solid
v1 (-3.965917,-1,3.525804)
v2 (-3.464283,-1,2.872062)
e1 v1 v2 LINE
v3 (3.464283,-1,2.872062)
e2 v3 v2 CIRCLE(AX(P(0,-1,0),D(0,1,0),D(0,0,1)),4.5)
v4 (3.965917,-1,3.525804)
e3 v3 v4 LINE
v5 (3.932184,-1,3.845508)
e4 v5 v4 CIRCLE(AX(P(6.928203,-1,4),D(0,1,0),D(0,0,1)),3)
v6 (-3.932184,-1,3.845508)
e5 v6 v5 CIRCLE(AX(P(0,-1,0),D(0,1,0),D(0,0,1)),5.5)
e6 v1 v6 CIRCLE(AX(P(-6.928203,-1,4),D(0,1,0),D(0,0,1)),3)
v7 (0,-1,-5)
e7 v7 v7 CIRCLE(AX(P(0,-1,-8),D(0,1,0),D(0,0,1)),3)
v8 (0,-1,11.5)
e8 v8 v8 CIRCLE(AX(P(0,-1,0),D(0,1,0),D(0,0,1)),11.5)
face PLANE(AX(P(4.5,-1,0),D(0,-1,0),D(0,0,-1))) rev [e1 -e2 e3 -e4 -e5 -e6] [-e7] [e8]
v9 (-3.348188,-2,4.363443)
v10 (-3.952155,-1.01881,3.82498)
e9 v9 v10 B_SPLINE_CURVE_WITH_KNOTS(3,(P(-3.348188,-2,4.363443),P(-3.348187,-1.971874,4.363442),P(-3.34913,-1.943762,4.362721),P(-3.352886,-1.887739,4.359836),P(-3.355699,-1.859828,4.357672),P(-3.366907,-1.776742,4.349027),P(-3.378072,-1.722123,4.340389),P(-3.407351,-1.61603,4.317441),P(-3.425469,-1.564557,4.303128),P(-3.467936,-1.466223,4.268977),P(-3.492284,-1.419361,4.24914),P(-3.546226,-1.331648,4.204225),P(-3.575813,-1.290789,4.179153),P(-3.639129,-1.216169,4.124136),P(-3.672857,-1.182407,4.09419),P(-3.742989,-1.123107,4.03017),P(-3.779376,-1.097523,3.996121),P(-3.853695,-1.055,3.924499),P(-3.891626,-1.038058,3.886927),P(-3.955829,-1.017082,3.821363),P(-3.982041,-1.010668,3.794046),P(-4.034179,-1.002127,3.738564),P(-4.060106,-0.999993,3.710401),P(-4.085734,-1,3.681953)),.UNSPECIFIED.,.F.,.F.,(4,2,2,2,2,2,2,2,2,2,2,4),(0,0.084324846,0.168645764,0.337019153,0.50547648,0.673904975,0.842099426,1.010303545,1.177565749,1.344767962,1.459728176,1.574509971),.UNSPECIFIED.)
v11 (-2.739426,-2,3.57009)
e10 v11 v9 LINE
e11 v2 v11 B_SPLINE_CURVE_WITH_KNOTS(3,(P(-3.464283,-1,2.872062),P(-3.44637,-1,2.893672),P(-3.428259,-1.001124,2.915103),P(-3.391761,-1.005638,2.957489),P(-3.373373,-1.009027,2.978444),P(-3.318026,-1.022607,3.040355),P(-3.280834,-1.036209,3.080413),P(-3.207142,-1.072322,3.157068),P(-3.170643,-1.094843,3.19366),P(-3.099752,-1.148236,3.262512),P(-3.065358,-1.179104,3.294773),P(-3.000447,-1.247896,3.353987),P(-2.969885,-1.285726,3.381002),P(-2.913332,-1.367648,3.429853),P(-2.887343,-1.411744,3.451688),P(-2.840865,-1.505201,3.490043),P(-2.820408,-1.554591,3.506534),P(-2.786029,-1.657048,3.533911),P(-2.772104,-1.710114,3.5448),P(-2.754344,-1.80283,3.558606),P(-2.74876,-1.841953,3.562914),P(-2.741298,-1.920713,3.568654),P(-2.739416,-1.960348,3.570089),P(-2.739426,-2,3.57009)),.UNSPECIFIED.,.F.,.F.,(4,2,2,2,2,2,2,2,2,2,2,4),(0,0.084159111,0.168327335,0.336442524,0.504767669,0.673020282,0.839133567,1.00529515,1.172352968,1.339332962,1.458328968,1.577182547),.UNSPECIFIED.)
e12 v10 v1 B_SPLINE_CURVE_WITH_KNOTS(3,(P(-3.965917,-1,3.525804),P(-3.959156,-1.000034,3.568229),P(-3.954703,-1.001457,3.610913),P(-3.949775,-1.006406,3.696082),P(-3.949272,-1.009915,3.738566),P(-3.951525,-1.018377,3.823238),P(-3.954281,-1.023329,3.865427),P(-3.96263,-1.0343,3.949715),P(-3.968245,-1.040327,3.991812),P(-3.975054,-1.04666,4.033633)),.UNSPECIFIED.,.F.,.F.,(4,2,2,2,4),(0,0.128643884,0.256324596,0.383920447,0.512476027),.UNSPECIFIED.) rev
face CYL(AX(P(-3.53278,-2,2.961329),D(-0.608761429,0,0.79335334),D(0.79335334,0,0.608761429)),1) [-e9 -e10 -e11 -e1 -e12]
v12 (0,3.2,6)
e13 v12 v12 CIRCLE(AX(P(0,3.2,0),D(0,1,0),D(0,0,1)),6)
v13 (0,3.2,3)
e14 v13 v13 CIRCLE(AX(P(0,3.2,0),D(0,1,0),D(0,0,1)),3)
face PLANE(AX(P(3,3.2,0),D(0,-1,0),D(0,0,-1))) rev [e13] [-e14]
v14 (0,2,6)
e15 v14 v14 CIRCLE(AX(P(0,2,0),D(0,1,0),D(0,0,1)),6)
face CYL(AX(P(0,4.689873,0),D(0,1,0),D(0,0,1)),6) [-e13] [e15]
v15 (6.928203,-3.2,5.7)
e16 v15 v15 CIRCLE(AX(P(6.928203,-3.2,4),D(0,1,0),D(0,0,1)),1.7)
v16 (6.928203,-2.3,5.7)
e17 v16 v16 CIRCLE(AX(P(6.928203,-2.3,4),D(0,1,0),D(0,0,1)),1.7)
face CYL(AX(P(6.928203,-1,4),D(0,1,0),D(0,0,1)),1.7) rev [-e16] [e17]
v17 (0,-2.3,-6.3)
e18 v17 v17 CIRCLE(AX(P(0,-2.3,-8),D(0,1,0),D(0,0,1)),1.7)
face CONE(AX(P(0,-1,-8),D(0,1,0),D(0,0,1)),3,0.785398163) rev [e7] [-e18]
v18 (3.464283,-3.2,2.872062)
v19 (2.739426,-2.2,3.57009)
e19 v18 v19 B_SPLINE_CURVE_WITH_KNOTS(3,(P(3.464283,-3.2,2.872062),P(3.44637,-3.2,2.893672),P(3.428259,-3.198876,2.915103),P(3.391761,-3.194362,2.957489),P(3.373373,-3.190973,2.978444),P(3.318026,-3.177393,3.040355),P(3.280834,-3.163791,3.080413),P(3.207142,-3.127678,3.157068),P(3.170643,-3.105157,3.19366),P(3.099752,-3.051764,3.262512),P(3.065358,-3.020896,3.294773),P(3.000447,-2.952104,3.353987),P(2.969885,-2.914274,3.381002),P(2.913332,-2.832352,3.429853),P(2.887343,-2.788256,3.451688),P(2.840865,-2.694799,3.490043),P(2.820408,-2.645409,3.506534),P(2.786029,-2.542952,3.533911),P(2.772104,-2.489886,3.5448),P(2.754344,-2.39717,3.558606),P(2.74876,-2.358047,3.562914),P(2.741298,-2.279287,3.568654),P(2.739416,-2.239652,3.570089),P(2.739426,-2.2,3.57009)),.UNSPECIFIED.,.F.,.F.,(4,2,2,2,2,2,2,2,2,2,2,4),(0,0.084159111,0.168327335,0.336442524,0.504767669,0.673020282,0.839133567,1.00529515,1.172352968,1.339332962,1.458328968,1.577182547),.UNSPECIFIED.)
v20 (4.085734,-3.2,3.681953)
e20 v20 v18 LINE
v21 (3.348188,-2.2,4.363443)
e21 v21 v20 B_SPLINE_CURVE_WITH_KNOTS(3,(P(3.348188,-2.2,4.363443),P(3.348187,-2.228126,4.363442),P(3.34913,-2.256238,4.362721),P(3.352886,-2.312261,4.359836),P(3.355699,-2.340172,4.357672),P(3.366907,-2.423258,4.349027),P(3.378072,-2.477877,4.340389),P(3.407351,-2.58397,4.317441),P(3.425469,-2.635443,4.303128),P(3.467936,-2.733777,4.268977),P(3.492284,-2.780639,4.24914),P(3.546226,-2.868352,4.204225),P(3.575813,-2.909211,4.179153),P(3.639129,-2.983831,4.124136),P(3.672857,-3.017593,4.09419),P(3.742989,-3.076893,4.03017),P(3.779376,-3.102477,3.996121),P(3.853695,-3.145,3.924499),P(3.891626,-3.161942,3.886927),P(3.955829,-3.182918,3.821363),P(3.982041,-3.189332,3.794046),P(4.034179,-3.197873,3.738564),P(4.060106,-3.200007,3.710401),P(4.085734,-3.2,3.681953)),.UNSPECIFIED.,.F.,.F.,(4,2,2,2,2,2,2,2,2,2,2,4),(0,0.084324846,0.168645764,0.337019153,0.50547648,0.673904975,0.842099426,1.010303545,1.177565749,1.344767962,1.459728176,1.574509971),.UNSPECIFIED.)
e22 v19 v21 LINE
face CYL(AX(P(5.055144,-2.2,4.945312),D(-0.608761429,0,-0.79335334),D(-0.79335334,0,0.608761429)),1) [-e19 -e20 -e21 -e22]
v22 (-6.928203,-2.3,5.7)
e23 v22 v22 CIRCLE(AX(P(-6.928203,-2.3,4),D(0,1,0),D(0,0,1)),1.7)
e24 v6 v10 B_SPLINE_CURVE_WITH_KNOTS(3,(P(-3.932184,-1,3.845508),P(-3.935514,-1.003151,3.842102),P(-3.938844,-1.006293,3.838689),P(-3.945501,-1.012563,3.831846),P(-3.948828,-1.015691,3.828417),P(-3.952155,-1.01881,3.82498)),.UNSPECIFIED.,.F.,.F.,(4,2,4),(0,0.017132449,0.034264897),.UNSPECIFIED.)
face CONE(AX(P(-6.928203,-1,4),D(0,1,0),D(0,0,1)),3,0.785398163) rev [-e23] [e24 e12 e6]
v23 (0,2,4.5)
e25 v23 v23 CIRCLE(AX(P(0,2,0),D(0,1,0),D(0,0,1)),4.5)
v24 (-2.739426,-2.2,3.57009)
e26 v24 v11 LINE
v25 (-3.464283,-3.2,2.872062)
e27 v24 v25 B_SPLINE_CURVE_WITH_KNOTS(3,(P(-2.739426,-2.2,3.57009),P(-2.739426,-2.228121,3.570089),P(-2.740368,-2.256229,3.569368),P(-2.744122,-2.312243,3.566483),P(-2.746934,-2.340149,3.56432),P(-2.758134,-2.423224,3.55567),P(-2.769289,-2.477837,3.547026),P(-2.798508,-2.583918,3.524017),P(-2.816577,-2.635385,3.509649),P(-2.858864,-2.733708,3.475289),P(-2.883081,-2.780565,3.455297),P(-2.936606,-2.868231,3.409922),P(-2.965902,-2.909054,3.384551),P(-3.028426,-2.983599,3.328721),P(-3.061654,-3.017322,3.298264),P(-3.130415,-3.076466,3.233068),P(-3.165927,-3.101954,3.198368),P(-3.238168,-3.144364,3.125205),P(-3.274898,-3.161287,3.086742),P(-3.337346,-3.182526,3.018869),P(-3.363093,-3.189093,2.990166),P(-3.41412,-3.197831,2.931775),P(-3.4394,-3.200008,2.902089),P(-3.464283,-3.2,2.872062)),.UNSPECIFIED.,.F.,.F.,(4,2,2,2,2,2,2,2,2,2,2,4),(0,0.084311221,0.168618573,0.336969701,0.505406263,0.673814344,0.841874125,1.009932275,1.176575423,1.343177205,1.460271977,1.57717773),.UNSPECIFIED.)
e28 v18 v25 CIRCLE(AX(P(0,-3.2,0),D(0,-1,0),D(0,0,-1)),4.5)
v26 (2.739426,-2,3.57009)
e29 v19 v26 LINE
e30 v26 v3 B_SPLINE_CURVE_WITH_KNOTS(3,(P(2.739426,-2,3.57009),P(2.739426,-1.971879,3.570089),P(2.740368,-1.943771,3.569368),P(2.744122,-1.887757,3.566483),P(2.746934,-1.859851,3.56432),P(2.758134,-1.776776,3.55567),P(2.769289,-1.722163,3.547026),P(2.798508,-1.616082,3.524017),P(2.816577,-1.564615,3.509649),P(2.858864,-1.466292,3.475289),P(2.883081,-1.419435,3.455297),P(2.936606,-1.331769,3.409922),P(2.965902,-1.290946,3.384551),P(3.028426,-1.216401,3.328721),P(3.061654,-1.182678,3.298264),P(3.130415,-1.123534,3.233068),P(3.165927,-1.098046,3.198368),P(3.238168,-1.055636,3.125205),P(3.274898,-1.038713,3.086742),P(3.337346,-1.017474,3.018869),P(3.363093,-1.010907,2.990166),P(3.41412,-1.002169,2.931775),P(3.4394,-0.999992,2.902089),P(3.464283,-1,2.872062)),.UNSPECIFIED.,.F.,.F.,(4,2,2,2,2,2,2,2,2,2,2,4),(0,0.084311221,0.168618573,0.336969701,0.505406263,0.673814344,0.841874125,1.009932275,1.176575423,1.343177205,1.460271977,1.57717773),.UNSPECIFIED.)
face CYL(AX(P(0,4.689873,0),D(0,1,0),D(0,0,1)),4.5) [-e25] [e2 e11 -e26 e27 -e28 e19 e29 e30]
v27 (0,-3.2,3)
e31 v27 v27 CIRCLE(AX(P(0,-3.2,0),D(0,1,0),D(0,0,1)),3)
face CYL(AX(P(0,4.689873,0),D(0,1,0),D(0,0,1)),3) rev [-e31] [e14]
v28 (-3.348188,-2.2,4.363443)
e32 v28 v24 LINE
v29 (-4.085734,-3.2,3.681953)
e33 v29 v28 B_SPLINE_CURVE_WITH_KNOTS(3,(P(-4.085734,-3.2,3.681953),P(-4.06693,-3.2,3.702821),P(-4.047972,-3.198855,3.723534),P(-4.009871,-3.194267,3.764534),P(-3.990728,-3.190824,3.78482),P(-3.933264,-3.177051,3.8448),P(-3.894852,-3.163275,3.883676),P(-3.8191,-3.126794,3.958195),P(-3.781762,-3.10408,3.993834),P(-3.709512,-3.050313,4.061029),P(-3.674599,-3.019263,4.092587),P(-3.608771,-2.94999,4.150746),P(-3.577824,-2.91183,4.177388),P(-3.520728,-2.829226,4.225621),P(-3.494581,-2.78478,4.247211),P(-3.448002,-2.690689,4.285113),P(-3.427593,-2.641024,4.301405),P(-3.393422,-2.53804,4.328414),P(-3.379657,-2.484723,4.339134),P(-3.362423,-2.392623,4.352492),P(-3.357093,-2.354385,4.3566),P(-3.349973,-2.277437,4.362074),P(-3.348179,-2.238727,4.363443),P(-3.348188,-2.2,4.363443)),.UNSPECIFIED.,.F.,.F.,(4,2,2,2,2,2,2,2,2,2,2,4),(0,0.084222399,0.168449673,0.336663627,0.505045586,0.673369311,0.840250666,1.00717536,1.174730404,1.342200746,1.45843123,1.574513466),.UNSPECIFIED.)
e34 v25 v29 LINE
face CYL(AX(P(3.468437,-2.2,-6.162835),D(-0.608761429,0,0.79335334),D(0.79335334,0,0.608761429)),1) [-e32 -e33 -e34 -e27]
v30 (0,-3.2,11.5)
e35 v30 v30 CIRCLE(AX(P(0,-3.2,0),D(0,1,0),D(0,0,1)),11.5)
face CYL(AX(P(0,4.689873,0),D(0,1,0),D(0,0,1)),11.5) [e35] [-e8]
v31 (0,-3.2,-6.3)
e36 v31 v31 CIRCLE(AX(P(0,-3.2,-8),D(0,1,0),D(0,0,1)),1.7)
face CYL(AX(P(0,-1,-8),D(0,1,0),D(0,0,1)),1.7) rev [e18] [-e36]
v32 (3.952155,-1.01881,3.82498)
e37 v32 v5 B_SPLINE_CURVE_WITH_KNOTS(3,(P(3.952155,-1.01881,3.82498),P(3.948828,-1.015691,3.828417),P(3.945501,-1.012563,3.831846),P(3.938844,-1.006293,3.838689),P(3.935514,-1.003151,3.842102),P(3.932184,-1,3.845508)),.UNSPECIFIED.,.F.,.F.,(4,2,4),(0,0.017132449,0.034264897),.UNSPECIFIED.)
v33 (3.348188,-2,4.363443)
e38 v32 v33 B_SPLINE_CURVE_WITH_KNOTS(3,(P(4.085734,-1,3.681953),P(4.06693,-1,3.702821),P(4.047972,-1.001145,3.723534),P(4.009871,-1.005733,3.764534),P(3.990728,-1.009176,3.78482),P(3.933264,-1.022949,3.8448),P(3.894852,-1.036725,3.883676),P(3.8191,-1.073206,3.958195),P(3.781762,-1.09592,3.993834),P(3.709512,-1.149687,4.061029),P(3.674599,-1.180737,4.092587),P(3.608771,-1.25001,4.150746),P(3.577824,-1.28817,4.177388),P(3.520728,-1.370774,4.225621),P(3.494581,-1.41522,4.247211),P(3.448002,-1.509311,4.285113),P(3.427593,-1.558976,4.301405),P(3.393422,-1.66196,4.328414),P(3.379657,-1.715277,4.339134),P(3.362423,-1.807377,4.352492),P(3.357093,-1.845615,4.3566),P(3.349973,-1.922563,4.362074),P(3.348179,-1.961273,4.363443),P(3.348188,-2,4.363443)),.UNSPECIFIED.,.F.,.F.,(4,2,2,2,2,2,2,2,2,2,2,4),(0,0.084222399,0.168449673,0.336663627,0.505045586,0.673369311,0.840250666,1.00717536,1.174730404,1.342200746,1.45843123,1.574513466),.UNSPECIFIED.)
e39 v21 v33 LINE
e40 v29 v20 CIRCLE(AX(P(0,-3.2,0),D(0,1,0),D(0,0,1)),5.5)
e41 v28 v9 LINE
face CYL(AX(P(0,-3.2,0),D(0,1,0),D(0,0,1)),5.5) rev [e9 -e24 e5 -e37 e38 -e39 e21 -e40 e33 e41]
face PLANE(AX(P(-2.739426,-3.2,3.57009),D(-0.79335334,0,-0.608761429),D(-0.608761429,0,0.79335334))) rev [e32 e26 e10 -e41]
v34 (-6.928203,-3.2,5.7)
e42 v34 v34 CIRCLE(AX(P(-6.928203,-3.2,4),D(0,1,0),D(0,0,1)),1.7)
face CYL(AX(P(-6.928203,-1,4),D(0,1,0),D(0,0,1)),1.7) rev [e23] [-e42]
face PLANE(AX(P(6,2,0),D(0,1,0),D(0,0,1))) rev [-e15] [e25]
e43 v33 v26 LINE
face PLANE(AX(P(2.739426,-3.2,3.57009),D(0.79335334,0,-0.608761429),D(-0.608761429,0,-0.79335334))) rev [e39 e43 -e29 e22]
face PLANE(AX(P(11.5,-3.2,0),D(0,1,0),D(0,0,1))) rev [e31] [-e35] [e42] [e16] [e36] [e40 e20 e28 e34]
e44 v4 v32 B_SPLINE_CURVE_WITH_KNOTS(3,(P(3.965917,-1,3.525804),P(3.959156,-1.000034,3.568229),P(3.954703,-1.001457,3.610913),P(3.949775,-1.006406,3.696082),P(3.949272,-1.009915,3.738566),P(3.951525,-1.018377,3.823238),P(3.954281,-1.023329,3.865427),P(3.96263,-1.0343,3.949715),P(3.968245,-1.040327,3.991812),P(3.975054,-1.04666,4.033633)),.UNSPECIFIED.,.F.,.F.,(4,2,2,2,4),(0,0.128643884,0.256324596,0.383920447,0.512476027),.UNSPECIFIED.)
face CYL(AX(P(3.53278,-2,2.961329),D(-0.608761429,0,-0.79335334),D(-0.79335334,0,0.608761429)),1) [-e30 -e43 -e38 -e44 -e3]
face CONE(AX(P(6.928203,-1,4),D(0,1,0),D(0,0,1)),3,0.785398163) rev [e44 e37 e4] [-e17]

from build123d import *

# Parameters (mm, degrees)
CSK_FOR_M3_FLAT_HEAD_MACHINE_SCREW1_AT_2_COUNT = 2
CSK_FOR_M3_FLAT_HEAD_MACHINE_SCREW1_AT_2_PITCH = 13.856406460551039
CSK_FOR_M3_FLAT_HEAD_MACHINE_SCREW1_AT_3_COUNT = 2
CSK_FOR_M3_FLAT_HEAD_MACHINE_SCREW1_AT_3_PITCH = 13.856406460550982
ENL_V_MAT_EXTRU_1_DEPTH                        = 17.797023545854785
CONG_1_R                                       = 1


with BuildPart() as part:
    # Esquisse1 → Révolution1 (revolve)
    with BuildSketch(Plane.XY, mode=Mode.PRIVATE) as r_volution1_sk:
        Polygon((2.9999999999999996, -3.2), (2.9999999999999996, 3.2), (5.999999999999998, 3.2), (5.999999999999998, 2), (4.499999999999998, 2), (4.5, -1), (11.500000000000002, -1), (11.500000000000002, -3.2), align=None)
    revolve(r_volution1_sk.sketch.rotate(Axis((0, 4.689873417721518, 0), (0, -1, 0)), 90), axis=Axis((0, 4.689873417721518, 0), (0, -1, 0)))

    # Esquisse4 → CSK for M3 Flat Head Machine Screw1 (revolve, cut)
    with BuildSketch(Plane(origin=(-6.928203230275546, -1, 3.999999999999936), x_dir=(0, 0, 1), z_dir=(1, 0, 0))):
        Polygon((0, 0), (-5.4e-16, 2.2), (1.6999999999999995, 2.2), (1.6999999999999997, 1.3000000000000007), (3, 0), align=None)
    csk_for_m3_flat_head_machine_screw1 = revolve(axis=Axis((-6.928203230275546, 5.349999999999991, 3.999999999999936), (0, -1, 0)), mode=Mode.SUBTRACT)

    # CSK for M3 Flat Head Machine Screw1 at 2: CSK for M3 Flat Head Machine Screw1 ×2
    with Locations(*[(i * CSK_FOR_M3_FLAT_HEAD_MACHINE_SCREW1_AT_2_PITCH, 0, 0) for i in range(1, CSK_FOR_M3_FLAT_HEAD_MACHINE_SCREW1_AT_2_COUNT)]):
        add(csk_for_m3_flat_head_machine_screw1, mode=Mode.SUBTRACT)

    # CSK for M3 Flat Head Machine Screw1 at 3: CSK for M3 Flat Head Machine Screw1 ×2
    with Locations(*[Vector(0.5000000000000041, 0, -0.8660254037844364) * (i * CSK_FOR_M3_FLAT_HEAD_MACHINE_SCREW1_AT_3_PITCH) for i in range(1, CSK_FOR_M3_FLAT_HEAD_MACHINE_SCREW1_AT_3_COUNT)]):
        add(csk_for_m3_flat_head_machine_screw1, mode=Mode.SUBTRACT)

    # Esquisse6 → Enlèv. mat.-Extru.1 (cut, through all)
    with BuildSketch(Plane(origin=(0, -1, 0), x_dir=(1, 0, 0), z_dir=(0, 1, 0))):
        with BuildLine():
            Line((2.739426430539251, -3.5700900313105515), (3.348187859547974, -4.363443371601785))
            ThreePointArc((3.348187859547974, -4.363443371601785), (2.78e-15, -5.5), (-3.3481878595479704, -4.363443371601789))
            Line((-3.3481878595479704, -4.363443371601789), (-2.7394264305392486, -3.5700900313105546))
            ThreePointArc((-2.7394264305392486, -3.5700900313105546), (2.27e-15, -4.499999999999999), (2.739426430539251, -3.5700900313105515))
        make_face()
    extrude(amount=-ENL_V_MAT_EXTRU_1_DEPTH, mode=Mode.SUBTRACT)

    # Congé1
    # the kernel refuses this fillet: 1 mm, written as the material it takes off along each edge
    with BuildSketch(Plane(origin=(4.870091432069782, -3.2, 6.346826722329871), x_dir=(0.7933533402912335, 0, -0.608761429008723), z_dir=(-0.608761429008723, 0, -0.7933533402912334))) as cong_1_piece_1_section:
        with BuildLine():
            CenterArc((CONG_1_R, -CONG_1_R), CONG_1_R, 90, 90)
            Line((0, -CONG_1_R), (0, 0))
            Line((0, 0), (CONG_1_R, 0))
        make_face()
    cong_1_piece_1 = extrude(amount=6.0000000000000036, mode=Mode.PRIVATE)
    cong_1_piece_1 = cong_1_piece_1 - Plane(origin=(-8.9e-16, -2.973934992670689, -7.55e-15), x_dir=(-0.6087614290087209, 0, 0.7933533402912349), z_dir=(0, 1, 0)) * Cylinder(4.500000000000007, 17, mode=Mode.PRIVATE)
    cong_1_piece_1 = cong_1_piece_1 & Plane(origin=(-4.4e-16, -2.973934992670689, -1.78e-15), x_dir=(0.6087614290087225, 0, 0.7933533402912338), z_dir=(0, 1, 0)) * Cylinder(5.500000000000003, 17, mode=Mode.PRIVATE)
    add(cong_1_piece_1, mode=Mode.SUBTRACT)
    with BuildSketch(Plane(origin=(-1.2175228580174442, -3.2, 1.586706680582469), x_dir=(-0.7933533402912343, 0, -0.608761429008722), z_dir=(-0.6087614290087219, 0, 0.7933533402912343))) as cong_1_piece_2_section:
        with BuildLine():
            CenterArc((CONG_1_R, -CONG_1_R), CONG_1_R, 90, 90)
            Line((-9e-17, -CONG_1_R), (0, 0))
            Line((0, 0), (CONG_1_R, 0))
        make_face()
    cong_1_piece_2 = extrude(amount=6, mode=Mode.PRIVATE)
    cong_1_piece_2 = cong_1_piece_2 - Plane(origin=(-8.9e-16, -2.973934929539706, -7.55e-15), x_dir=(-0.6087614290087209, 0, 0.7933533402912349), z_dir=(0, 1, 0)) * Cylinder(4.500000000000007, 16, mode=Mode.PRIVATE)
    cong_1_piece_2 = cong_1_piece_2 & Plane(origin=(-4.4e-16, -2.973934929539706, -1.78e-15), x_dir=(0.6087614290087225, 0, 0.7933533402912338), z_dir=(0, 1, 0)) * Cylinder(5.500000000000003, 16, mode=Mode.PRIVATE)
    add(cong_1_piece_2, mode=Mode.SUBTRACT)
    with BuildSketch(Plane(origin=(-4.870091432069775, -1, 6.346826722329874), x_dir=(0, -1, 0), z_dir=(0.6087614290087219, 0, -0.7933533402912343))) as cong_1_piece_3_section:
        with BuildLine():
            CenterArc((CONG_1_R, CONG_1_R), CONG_1_R, 180.00000000000003, 90)
            Line((0, CONG_1_R), (0, 0))
            Line((0, 0), (CONG_1_R, 0))
        make_face()
    cong_1_piece_3 = extrude(amount=6, mode=Mode.PRIVATE)
    cong_1_piece_3 = cong_1_piece_3 - Plane(origin=(-8.9e-16, -1.2260647234530146, -7.55e-15), x_dir=(-0.6087614290087209, 0, 0.7933533402912349), z_dir=(0, 1, 0)) * Cylinder(4.500000000000007, 16, mode=Mode.PRIVATE)
    cong_1_piece_3 = cong_1_piece_3 & Plane(origin=(-4.4e-16, -1.2260647234530146, -1.78e-15), x_dir=(0.6087614290087225, 0, 0.7933533402912338), z_dir=(0, 1, 0)) * Cylinder(5.500000000000003, 16, mode=Mode.PRIVATE)
    add(cong_1_piece_3, mode=Mode.SUBTRACT)
    with BuildSketch(Plane(origin=(1.2175228580174433, -1, 1.586706680582468), x_dir=(2.1e-16, -1, -1.6e-16), z_dir=(0.608761429008723, 0, 0.7933533402912334))) as cong_1_piece_4_section:
        with BuildLine():
            CenterArc((CONG_1_R, CONG_1_R), CONG_1_R, 180, 90)
            Line((2.7e-16, CONG_1_R), (0, 0))
            Line((0, 0), (CONG_1_R, 0))
        make_face()
    cong_1_piece_4 = extrude(amount=6, mode=Mode.PRIVATE)
    cong_1_piece_4 = cong_1_piece_4 - Plane(origin=(-8.9e-16, -1.226064411710552, -7.55e-15), x_dir=(-0.6087614290087209, 0, 0.7933533402912349), z_dir=(0, 1, 0)) * Cylinder(4.500000000000007, 16, mode=Mode.PRIVATE)
    cong_1_piece_4 = cong_1_piece_4 & Plane(origin=(-4.4e-16, -1.226064411710552, -1.78e-15), x_dir=(0.6087614290087225, 0, 0.7933533402912338), z_dir=(0, 1, 0)) * Cylinder(5.500000000000003, 16, mode=Mode.PRIVATE)
    add(cong_1_piece_4, mode=Mode.SUBTRACT)


solid = part.part
